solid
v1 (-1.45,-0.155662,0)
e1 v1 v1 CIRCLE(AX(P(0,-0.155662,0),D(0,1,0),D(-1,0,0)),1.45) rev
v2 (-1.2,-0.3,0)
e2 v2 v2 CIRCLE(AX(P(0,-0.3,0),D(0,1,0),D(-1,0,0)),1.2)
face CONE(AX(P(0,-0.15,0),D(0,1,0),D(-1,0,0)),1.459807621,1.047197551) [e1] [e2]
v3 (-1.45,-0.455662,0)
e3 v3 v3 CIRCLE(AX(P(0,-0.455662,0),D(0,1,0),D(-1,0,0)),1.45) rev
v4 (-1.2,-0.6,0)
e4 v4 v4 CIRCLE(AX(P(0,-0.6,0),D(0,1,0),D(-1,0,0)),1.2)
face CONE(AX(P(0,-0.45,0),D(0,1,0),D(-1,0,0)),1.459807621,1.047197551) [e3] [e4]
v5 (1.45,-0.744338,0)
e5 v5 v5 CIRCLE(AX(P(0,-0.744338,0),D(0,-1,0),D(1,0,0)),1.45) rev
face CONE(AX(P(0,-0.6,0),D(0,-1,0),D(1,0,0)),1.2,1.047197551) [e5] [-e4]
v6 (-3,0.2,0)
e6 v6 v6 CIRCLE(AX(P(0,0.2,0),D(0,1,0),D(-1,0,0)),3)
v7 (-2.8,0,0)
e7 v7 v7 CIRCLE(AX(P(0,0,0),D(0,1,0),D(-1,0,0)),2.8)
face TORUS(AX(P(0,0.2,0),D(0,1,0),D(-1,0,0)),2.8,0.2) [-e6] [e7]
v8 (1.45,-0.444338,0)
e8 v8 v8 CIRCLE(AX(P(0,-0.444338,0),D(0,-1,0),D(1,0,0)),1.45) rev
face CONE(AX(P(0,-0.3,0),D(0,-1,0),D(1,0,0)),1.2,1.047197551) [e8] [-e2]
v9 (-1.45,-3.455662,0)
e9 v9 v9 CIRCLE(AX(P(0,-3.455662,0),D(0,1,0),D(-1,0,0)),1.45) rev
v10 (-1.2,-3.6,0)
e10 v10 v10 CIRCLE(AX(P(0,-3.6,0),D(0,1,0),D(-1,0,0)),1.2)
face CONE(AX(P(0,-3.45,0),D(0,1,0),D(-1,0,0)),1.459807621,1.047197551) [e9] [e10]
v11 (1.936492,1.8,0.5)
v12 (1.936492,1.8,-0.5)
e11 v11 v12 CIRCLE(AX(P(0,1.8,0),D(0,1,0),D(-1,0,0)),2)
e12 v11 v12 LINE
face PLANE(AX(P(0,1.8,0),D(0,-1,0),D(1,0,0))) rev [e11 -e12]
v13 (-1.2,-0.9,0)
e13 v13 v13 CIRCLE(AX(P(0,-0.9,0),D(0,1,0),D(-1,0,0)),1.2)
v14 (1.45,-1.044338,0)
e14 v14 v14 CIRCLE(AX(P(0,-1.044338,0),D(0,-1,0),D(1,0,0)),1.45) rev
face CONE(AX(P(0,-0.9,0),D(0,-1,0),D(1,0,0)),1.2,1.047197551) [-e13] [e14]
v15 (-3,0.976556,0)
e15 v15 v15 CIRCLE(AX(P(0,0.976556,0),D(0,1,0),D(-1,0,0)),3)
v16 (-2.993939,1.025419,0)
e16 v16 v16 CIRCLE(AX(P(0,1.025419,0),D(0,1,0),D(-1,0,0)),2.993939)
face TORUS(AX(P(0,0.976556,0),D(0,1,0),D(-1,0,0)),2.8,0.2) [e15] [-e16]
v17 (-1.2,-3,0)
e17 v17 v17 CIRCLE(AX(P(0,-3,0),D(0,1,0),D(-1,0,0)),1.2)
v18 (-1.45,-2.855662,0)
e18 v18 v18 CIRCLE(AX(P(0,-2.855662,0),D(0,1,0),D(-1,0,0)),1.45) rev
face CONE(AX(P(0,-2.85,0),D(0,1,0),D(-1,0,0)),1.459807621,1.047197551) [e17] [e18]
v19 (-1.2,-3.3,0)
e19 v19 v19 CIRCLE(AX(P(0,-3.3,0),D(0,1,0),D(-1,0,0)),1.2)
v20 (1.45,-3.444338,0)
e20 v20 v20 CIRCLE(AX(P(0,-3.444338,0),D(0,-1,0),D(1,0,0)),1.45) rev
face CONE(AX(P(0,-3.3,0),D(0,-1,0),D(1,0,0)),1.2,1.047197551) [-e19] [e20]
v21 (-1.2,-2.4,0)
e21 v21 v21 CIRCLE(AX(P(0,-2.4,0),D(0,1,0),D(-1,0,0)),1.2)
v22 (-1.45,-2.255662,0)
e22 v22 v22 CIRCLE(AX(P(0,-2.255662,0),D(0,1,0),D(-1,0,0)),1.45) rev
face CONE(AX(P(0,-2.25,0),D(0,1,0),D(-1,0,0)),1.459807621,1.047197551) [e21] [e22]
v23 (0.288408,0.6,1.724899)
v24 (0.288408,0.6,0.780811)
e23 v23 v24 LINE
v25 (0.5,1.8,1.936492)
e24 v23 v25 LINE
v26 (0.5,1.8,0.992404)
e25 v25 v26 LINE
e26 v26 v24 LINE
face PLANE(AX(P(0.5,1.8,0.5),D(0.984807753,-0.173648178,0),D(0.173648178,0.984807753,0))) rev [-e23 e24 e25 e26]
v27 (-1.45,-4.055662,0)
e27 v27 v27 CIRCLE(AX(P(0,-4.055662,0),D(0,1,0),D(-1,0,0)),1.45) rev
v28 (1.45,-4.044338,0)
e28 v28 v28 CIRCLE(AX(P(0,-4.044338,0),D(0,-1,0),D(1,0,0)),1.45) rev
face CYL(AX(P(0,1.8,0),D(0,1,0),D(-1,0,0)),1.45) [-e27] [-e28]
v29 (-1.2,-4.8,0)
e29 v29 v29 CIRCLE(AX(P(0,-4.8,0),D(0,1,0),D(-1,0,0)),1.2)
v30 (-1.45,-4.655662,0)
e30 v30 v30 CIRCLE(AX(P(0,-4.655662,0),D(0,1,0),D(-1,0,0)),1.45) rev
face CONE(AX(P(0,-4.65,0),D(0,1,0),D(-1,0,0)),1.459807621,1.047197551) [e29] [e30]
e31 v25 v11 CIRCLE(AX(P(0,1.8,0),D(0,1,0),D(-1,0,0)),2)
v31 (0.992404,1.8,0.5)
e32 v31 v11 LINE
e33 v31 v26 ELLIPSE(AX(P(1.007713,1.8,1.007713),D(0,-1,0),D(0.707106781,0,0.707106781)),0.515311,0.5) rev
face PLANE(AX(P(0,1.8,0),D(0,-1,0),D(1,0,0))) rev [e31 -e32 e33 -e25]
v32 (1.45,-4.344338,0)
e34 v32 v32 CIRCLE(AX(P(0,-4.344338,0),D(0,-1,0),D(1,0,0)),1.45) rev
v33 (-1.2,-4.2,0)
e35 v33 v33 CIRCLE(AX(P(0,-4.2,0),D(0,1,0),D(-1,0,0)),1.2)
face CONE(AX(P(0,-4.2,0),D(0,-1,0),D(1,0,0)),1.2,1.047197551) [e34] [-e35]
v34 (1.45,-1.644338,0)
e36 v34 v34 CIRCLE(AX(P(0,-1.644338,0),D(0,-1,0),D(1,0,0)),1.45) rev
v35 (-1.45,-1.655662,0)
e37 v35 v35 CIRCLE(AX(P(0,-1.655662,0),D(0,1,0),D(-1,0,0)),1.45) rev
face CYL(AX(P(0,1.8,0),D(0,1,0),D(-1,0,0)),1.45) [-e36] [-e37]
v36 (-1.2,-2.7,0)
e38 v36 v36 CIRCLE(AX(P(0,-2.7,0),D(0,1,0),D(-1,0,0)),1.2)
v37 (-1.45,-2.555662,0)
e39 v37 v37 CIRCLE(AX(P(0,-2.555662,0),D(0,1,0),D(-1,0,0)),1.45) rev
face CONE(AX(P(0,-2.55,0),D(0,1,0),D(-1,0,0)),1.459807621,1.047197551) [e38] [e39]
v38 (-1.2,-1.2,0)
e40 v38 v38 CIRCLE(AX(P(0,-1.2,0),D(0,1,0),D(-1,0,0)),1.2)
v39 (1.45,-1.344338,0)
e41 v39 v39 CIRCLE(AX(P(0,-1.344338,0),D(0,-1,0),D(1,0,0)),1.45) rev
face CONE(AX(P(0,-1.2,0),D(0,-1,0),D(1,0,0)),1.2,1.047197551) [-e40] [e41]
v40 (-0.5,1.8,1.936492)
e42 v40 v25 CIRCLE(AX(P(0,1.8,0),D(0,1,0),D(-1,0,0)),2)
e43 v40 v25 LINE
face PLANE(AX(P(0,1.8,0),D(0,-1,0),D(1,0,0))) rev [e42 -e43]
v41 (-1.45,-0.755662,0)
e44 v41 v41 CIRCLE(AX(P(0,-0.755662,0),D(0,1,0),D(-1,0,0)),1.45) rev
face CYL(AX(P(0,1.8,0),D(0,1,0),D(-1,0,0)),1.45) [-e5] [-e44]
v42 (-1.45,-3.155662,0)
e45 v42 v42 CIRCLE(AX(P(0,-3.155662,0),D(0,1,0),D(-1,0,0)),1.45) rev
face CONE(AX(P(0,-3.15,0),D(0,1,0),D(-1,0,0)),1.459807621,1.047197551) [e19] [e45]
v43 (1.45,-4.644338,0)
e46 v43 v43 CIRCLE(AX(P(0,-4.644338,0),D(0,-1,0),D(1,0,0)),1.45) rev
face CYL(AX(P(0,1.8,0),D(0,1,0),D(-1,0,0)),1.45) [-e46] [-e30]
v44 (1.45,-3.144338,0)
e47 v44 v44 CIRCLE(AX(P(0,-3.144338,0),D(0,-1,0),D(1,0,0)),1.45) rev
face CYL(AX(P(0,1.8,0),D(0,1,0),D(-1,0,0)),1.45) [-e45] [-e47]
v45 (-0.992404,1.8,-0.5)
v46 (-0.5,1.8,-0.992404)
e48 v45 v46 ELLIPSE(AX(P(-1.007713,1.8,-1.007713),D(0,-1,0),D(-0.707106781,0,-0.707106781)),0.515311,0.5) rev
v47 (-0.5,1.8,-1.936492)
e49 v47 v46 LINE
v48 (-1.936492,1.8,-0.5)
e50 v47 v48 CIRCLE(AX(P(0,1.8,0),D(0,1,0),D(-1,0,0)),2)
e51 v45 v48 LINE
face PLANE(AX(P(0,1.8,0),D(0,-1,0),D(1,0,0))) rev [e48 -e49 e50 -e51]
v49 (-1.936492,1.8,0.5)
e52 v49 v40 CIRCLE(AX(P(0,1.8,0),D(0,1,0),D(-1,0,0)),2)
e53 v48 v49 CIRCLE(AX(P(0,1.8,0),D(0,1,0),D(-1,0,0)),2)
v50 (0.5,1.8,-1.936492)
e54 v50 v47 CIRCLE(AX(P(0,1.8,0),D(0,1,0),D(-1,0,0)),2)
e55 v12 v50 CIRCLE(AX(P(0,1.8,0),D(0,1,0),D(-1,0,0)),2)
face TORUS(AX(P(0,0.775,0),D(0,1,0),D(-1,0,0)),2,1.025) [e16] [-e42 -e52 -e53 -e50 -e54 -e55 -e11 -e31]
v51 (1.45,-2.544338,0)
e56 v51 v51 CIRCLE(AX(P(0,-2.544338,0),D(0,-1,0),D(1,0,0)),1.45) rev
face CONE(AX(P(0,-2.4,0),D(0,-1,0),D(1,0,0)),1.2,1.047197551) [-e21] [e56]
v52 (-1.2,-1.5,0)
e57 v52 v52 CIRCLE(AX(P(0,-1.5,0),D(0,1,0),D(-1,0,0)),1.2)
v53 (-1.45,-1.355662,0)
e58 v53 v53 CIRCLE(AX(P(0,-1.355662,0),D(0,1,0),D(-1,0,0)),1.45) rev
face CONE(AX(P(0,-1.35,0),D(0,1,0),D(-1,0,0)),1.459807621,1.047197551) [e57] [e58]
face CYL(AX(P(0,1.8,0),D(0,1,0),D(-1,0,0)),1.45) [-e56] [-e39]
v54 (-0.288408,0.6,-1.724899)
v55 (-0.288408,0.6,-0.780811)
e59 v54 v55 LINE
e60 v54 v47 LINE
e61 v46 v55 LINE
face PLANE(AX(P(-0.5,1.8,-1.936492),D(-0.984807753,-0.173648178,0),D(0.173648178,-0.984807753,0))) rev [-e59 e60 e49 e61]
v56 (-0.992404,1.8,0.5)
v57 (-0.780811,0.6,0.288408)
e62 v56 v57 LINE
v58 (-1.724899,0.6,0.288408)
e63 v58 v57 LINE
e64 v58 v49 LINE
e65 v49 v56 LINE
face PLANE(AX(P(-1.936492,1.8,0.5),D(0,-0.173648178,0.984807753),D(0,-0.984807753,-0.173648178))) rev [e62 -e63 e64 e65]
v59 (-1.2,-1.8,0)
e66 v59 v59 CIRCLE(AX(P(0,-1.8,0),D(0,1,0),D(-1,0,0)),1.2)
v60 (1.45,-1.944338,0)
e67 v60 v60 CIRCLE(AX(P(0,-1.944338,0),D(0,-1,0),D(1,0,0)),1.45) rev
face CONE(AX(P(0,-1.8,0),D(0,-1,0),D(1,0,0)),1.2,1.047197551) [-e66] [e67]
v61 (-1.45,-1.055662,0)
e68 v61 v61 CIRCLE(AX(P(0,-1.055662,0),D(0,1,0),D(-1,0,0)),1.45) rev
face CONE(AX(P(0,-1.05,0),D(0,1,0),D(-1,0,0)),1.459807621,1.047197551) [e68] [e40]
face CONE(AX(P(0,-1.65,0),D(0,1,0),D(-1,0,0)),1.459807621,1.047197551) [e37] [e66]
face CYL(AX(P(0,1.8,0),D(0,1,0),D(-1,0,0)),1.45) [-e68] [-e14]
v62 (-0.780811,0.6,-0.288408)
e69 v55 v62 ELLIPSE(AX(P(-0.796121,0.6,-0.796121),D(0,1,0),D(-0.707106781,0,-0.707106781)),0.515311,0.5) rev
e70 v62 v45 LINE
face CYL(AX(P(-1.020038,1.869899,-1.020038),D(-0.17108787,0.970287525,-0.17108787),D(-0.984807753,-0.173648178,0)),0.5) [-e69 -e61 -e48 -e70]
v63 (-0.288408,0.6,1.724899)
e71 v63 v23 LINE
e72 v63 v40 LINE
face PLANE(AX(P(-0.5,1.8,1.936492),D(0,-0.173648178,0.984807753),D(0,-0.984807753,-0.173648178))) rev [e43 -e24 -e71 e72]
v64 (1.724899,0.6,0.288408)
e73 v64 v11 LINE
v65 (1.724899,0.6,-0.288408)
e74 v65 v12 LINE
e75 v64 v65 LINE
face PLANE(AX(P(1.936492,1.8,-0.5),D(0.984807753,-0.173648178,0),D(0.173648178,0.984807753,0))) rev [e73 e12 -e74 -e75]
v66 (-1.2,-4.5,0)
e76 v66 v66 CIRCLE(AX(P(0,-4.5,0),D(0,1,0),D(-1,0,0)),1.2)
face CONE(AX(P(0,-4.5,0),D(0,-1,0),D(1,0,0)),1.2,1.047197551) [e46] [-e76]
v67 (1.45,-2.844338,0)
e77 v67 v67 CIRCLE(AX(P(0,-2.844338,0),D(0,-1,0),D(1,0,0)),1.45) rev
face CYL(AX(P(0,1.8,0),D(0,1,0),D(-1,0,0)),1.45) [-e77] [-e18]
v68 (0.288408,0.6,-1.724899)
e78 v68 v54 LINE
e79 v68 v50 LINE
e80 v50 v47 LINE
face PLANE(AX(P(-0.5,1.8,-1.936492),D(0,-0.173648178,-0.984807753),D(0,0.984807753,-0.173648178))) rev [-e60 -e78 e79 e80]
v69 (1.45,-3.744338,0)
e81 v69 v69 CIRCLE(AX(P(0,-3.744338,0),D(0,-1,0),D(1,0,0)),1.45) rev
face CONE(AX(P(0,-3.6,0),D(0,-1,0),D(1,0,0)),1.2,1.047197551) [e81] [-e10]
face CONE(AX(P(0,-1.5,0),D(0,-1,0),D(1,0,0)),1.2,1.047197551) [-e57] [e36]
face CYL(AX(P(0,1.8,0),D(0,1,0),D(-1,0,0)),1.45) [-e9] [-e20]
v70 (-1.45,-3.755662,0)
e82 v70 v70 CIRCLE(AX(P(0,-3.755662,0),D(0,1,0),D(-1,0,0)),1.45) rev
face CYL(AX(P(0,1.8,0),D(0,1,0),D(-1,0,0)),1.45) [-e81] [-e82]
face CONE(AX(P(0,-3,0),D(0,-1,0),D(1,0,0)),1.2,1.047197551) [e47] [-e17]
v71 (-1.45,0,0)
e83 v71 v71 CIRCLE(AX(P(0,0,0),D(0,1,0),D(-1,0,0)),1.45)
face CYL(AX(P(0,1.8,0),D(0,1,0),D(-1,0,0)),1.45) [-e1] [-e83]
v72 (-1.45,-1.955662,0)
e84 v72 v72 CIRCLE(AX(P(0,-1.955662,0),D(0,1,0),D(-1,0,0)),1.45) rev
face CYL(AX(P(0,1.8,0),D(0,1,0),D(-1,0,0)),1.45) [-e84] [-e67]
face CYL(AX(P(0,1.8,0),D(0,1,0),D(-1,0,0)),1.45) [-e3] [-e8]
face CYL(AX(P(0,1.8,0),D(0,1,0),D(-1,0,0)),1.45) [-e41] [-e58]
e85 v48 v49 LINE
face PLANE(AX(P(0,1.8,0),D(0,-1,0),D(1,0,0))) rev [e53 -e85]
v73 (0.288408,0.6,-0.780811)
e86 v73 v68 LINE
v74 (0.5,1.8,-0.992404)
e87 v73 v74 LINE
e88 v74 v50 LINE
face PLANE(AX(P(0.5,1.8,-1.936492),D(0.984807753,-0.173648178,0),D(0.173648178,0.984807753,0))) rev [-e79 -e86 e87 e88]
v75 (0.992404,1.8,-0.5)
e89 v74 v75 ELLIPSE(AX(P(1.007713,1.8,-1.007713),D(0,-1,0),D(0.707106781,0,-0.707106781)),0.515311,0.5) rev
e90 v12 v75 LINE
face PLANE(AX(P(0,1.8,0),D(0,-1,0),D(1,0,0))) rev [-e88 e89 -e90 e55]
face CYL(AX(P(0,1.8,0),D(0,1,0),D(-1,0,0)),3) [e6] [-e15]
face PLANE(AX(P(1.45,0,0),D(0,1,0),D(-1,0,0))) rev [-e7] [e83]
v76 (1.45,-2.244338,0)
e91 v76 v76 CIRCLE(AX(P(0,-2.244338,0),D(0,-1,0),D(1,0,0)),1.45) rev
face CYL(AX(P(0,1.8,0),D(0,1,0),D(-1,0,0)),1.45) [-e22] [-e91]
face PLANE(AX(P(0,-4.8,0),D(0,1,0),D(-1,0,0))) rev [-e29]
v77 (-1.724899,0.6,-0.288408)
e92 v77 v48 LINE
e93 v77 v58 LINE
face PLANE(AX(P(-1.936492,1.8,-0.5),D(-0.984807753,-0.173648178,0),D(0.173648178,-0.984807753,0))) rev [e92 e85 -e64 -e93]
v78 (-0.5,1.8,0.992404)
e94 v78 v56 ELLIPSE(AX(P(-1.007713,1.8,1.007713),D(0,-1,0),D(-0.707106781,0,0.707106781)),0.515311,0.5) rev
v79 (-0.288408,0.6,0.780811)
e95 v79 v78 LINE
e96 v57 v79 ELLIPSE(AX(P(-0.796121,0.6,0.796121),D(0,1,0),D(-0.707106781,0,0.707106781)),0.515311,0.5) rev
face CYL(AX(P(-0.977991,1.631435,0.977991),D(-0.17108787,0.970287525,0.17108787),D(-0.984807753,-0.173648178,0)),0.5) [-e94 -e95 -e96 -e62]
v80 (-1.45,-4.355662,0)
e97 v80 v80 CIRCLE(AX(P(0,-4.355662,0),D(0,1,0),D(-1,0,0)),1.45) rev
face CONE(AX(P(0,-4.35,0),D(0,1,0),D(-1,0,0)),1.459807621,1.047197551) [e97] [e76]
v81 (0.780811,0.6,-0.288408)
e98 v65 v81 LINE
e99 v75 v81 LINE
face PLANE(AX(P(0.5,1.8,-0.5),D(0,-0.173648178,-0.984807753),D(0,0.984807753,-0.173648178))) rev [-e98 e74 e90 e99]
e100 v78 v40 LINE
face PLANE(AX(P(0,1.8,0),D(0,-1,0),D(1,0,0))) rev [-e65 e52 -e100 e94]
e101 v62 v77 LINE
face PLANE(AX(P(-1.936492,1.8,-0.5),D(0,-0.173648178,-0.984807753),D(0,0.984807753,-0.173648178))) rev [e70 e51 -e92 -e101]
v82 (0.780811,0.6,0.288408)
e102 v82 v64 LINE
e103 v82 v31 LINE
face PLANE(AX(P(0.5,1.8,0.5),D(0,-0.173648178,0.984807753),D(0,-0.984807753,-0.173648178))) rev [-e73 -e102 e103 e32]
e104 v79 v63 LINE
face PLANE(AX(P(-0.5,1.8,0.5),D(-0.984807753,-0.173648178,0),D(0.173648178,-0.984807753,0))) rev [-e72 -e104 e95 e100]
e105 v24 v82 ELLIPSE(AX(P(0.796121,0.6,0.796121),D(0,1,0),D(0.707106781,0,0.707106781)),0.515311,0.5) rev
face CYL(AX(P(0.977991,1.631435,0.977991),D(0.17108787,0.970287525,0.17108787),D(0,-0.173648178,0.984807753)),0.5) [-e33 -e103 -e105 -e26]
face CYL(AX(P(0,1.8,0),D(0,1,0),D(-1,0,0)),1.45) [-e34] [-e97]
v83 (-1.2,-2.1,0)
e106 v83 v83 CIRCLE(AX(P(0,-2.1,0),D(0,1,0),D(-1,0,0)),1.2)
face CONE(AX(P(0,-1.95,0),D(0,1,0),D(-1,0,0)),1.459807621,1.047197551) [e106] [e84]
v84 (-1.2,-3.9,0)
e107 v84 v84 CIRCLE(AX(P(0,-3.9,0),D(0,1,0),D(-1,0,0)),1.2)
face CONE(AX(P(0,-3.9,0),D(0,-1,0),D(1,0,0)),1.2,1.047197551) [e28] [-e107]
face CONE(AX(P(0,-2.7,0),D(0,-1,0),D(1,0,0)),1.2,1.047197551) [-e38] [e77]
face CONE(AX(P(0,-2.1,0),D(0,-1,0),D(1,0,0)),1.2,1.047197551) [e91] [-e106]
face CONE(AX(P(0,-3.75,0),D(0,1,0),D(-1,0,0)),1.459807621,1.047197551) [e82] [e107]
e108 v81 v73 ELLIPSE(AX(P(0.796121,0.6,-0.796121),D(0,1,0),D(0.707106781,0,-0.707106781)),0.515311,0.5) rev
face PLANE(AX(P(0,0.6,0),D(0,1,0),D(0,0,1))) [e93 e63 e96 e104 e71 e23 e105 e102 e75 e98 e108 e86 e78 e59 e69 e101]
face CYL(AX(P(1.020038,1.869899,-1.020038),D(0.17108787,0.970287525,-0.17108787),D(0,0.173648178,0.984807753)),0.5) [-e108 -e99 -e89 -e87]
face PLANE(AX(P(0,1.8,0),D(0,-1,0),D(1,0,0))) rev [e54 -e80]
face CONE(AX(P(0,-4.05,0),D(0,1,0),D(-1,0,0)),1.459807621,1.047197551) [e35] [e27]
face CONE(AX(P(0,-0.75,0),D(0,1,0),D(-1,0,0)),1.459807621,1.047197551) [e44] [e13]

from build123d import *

# Parameters (mm, degrees)
CUT_EXTRUDE1_DEPTH = 1.2
CUT_EXTRUDE1_DRAFT = -10
FILLET1_R          = 0.5


# Read off the part's stored shape, not the designer's step: LPattern1
with BuildPart() as part:
    # Sketch1 → Revolve1 (revolve)
    with BuildSketch(Plane.XY, mode=Mode.PRIVATE) as revolve1_sk:
        with BuildLine():
            Line((0, 1.8), (0, -4.8))
            Line((0, -4.8), (1.45, -4.8))
            Line((1.45, -4.8), (1.45, 0))
            Line((1.45, 0), (2.8, 0))
            ThreePointArc((2.8, 0), (2.941421356, 0.058578644), (3, 0.2))
            Line((3, 0.2), (3, 0.976556444))
            ThreePointArc((3, 0.976556444), (2.998479065, 1.001174742), (2.993939394, 1.025418612))
            ThreePointArc((2.993939394, 1.025418612), (2.630057903, 1.583487501), (2, 1.8))
            Line((2, 1.8), (0, 1.8))
        make_face()
    revolve(revolve1_sk.sketch.rotate(Axis((0, 1.8, 0), (0, -1, 0)), 180), axis=Axis((0, 1.8, 0), (0, -1, 0)))


with BuildPart() as cut_extrude1_tool:
    # Sketch2 → Cut-Extrude1 (with draft: the straight prism first)
    with BuildSketch(Plane(origin=(0, 1.8, 0), x_dir=(1, 0, 0), z_dir=(0, 1, 0))):
        Polygon((-0.5, 1.936491673), (-0.5, 0.5), (-1.936491673, 0.5), (-1.936491673, -0.5), (-0.5, -0.5), (-0.5, -1.936491673), (0.5, -1.936491673), (0.5, -0.5), (1.936491673, -0.5), (1.936491673, 0.5), (0.5, 0.5), (0.5, 1.936491673), align=None)
    extrude(amount=-CUT_EXTRUDE1_DEPTH)
    # Cut-Extrude1: the draft: its side faces are tilted about the plane it starts from
    cut_extrude1_sides = [cut_extrude1_tool.faces().sort_by_distance(p)[0] for p in [
        (-0.5, 1.2, -1.218245837),
        (-1.218245837, 1.2, -0.5),
        (-1.936491673, 1.2, 0),
        (-1.218245837, 1.2, 0.5),
        (-0.5, 1.2, 1.218245837),
        (0, 1.2, 1.936491673),
        (0.5, 1.2, 1.218245837),
        (1.218245837, 1.2, 0.5),
        (1.936491673, 1.2, 0),
        (1.218245837, 1.2, -0.5),
        (0.5, 1.2, -1.218245837),
        (0, 1.2, -1.936491673),
    ]]
    draft(cut_extrude1_sides, Plane(origin=(0, 1.8, 0), x_dir=(1, 0, 0), z_dir=(0, 1, 0)), CUT_EXTRUDE1_DRAFT)


with BuildPart() as part_1:
    add(part.part)

    # Cut-Extrude1: cut by cut_extrude1_tool
    add(cut_extrude1_tool.part, mode=Mode.SUBTRACT)

    # Fillet1
    fillet1_edges = [part_1.edges().sort_by_distance(p)[0] for p in [
        (0.394203812, 1.2, 0.394203812),
        (-0.394203812, 1.2, 0.394203812),
        (-0.394203812, 1.2, -0.394203812),
        (0.394203812, 1.2, -0.394203812),
    ]]
    fillet(fillet1_edges, radius=FILLET1_R)

    # Sketch3 → Cut-Revolve1 (revolve, cut)
    with BuildSketch(Plane.XY, mode=Mode.PRIVATE) as cut_revolve1_sk:
        Polygon((1.759807621, -4.65), (1.759807621, -4.95), (1.459807621, -4.95), (1.2, -4.8), (1.459807621, -4.65), align=None)
    revolve(cut_revolve1_sk.sketch.rotate(Axis((0, 0, 0), (0, -1, 0)), 180), axis=Axis((0, 0, 0), (0, -1, 0)), mode=Mode.SUBTRACT)

    # LPattern1 outline → LPattern1 (revolve, cut)
    with BuildSketch(Plane.XY):
        Polygon((1.45, -3.755662433), (1.2, -3.9), (1.45, -4.044337567), align=None)
        Polygon((1.2, -3.6), (1.45, -3.744337567), (1.45, -3.455662433), align=None)
        Polygon((1.45, -4.344337567), (1.45, -4.055662433), (1.2, -4.2), align=None)
        Polygon((1.2, -3.3), (1.45, -3.444337567), (1.45, -3.155662433), align=None)
        Polygon((1.45, -4.644337567), (1.45, -4.355662433), (1.2, -4.5), align=None)
        Polygon((1.2, -3), (1.45, -3.144337567), (1.45, -2.855662433), align=None)
        Polygon((1.2, -2.7), (1.45, -2.844337567), (1.45, -2.555662433), align=None)
        Polygon((1.2, -2.4), (1.45, -2.544337567), (1.45, -2.255662433), align=None)
        Polygon((1.2, -2.1), (1.45, -2.244337567), (1.45, -1.955662433), align=None)
        Polygon((1.2, -1.8), (1.45, -1.944337567), (1.45, -1.655662433), align=None)
        Polygon((1.2, -1.5), (1.45, -1.644337567), (1.45, -1.355662433), align=None)
        Polygon((1.2, -1.2), (1.45, -1.344337567), (1.45, -1.055662433), align=None)
        Polygon((1.2, -0.9), (1.45, -1.044337567), (1.45, -0.755662433), align=None)
        Polygon((1.2, -0.6), (1.45, -0.744337567), (1.45, -0.455662433), align=None)
        Polygon((1.2, -0.3), (1.45, -0.444337567), (1.45, -0.155662433), align=None)
    revolve(axis=Axis((0, 0, 0), (0, 1, 0)), mode=Mode.SUBTRACT)


solid = part_1.part
